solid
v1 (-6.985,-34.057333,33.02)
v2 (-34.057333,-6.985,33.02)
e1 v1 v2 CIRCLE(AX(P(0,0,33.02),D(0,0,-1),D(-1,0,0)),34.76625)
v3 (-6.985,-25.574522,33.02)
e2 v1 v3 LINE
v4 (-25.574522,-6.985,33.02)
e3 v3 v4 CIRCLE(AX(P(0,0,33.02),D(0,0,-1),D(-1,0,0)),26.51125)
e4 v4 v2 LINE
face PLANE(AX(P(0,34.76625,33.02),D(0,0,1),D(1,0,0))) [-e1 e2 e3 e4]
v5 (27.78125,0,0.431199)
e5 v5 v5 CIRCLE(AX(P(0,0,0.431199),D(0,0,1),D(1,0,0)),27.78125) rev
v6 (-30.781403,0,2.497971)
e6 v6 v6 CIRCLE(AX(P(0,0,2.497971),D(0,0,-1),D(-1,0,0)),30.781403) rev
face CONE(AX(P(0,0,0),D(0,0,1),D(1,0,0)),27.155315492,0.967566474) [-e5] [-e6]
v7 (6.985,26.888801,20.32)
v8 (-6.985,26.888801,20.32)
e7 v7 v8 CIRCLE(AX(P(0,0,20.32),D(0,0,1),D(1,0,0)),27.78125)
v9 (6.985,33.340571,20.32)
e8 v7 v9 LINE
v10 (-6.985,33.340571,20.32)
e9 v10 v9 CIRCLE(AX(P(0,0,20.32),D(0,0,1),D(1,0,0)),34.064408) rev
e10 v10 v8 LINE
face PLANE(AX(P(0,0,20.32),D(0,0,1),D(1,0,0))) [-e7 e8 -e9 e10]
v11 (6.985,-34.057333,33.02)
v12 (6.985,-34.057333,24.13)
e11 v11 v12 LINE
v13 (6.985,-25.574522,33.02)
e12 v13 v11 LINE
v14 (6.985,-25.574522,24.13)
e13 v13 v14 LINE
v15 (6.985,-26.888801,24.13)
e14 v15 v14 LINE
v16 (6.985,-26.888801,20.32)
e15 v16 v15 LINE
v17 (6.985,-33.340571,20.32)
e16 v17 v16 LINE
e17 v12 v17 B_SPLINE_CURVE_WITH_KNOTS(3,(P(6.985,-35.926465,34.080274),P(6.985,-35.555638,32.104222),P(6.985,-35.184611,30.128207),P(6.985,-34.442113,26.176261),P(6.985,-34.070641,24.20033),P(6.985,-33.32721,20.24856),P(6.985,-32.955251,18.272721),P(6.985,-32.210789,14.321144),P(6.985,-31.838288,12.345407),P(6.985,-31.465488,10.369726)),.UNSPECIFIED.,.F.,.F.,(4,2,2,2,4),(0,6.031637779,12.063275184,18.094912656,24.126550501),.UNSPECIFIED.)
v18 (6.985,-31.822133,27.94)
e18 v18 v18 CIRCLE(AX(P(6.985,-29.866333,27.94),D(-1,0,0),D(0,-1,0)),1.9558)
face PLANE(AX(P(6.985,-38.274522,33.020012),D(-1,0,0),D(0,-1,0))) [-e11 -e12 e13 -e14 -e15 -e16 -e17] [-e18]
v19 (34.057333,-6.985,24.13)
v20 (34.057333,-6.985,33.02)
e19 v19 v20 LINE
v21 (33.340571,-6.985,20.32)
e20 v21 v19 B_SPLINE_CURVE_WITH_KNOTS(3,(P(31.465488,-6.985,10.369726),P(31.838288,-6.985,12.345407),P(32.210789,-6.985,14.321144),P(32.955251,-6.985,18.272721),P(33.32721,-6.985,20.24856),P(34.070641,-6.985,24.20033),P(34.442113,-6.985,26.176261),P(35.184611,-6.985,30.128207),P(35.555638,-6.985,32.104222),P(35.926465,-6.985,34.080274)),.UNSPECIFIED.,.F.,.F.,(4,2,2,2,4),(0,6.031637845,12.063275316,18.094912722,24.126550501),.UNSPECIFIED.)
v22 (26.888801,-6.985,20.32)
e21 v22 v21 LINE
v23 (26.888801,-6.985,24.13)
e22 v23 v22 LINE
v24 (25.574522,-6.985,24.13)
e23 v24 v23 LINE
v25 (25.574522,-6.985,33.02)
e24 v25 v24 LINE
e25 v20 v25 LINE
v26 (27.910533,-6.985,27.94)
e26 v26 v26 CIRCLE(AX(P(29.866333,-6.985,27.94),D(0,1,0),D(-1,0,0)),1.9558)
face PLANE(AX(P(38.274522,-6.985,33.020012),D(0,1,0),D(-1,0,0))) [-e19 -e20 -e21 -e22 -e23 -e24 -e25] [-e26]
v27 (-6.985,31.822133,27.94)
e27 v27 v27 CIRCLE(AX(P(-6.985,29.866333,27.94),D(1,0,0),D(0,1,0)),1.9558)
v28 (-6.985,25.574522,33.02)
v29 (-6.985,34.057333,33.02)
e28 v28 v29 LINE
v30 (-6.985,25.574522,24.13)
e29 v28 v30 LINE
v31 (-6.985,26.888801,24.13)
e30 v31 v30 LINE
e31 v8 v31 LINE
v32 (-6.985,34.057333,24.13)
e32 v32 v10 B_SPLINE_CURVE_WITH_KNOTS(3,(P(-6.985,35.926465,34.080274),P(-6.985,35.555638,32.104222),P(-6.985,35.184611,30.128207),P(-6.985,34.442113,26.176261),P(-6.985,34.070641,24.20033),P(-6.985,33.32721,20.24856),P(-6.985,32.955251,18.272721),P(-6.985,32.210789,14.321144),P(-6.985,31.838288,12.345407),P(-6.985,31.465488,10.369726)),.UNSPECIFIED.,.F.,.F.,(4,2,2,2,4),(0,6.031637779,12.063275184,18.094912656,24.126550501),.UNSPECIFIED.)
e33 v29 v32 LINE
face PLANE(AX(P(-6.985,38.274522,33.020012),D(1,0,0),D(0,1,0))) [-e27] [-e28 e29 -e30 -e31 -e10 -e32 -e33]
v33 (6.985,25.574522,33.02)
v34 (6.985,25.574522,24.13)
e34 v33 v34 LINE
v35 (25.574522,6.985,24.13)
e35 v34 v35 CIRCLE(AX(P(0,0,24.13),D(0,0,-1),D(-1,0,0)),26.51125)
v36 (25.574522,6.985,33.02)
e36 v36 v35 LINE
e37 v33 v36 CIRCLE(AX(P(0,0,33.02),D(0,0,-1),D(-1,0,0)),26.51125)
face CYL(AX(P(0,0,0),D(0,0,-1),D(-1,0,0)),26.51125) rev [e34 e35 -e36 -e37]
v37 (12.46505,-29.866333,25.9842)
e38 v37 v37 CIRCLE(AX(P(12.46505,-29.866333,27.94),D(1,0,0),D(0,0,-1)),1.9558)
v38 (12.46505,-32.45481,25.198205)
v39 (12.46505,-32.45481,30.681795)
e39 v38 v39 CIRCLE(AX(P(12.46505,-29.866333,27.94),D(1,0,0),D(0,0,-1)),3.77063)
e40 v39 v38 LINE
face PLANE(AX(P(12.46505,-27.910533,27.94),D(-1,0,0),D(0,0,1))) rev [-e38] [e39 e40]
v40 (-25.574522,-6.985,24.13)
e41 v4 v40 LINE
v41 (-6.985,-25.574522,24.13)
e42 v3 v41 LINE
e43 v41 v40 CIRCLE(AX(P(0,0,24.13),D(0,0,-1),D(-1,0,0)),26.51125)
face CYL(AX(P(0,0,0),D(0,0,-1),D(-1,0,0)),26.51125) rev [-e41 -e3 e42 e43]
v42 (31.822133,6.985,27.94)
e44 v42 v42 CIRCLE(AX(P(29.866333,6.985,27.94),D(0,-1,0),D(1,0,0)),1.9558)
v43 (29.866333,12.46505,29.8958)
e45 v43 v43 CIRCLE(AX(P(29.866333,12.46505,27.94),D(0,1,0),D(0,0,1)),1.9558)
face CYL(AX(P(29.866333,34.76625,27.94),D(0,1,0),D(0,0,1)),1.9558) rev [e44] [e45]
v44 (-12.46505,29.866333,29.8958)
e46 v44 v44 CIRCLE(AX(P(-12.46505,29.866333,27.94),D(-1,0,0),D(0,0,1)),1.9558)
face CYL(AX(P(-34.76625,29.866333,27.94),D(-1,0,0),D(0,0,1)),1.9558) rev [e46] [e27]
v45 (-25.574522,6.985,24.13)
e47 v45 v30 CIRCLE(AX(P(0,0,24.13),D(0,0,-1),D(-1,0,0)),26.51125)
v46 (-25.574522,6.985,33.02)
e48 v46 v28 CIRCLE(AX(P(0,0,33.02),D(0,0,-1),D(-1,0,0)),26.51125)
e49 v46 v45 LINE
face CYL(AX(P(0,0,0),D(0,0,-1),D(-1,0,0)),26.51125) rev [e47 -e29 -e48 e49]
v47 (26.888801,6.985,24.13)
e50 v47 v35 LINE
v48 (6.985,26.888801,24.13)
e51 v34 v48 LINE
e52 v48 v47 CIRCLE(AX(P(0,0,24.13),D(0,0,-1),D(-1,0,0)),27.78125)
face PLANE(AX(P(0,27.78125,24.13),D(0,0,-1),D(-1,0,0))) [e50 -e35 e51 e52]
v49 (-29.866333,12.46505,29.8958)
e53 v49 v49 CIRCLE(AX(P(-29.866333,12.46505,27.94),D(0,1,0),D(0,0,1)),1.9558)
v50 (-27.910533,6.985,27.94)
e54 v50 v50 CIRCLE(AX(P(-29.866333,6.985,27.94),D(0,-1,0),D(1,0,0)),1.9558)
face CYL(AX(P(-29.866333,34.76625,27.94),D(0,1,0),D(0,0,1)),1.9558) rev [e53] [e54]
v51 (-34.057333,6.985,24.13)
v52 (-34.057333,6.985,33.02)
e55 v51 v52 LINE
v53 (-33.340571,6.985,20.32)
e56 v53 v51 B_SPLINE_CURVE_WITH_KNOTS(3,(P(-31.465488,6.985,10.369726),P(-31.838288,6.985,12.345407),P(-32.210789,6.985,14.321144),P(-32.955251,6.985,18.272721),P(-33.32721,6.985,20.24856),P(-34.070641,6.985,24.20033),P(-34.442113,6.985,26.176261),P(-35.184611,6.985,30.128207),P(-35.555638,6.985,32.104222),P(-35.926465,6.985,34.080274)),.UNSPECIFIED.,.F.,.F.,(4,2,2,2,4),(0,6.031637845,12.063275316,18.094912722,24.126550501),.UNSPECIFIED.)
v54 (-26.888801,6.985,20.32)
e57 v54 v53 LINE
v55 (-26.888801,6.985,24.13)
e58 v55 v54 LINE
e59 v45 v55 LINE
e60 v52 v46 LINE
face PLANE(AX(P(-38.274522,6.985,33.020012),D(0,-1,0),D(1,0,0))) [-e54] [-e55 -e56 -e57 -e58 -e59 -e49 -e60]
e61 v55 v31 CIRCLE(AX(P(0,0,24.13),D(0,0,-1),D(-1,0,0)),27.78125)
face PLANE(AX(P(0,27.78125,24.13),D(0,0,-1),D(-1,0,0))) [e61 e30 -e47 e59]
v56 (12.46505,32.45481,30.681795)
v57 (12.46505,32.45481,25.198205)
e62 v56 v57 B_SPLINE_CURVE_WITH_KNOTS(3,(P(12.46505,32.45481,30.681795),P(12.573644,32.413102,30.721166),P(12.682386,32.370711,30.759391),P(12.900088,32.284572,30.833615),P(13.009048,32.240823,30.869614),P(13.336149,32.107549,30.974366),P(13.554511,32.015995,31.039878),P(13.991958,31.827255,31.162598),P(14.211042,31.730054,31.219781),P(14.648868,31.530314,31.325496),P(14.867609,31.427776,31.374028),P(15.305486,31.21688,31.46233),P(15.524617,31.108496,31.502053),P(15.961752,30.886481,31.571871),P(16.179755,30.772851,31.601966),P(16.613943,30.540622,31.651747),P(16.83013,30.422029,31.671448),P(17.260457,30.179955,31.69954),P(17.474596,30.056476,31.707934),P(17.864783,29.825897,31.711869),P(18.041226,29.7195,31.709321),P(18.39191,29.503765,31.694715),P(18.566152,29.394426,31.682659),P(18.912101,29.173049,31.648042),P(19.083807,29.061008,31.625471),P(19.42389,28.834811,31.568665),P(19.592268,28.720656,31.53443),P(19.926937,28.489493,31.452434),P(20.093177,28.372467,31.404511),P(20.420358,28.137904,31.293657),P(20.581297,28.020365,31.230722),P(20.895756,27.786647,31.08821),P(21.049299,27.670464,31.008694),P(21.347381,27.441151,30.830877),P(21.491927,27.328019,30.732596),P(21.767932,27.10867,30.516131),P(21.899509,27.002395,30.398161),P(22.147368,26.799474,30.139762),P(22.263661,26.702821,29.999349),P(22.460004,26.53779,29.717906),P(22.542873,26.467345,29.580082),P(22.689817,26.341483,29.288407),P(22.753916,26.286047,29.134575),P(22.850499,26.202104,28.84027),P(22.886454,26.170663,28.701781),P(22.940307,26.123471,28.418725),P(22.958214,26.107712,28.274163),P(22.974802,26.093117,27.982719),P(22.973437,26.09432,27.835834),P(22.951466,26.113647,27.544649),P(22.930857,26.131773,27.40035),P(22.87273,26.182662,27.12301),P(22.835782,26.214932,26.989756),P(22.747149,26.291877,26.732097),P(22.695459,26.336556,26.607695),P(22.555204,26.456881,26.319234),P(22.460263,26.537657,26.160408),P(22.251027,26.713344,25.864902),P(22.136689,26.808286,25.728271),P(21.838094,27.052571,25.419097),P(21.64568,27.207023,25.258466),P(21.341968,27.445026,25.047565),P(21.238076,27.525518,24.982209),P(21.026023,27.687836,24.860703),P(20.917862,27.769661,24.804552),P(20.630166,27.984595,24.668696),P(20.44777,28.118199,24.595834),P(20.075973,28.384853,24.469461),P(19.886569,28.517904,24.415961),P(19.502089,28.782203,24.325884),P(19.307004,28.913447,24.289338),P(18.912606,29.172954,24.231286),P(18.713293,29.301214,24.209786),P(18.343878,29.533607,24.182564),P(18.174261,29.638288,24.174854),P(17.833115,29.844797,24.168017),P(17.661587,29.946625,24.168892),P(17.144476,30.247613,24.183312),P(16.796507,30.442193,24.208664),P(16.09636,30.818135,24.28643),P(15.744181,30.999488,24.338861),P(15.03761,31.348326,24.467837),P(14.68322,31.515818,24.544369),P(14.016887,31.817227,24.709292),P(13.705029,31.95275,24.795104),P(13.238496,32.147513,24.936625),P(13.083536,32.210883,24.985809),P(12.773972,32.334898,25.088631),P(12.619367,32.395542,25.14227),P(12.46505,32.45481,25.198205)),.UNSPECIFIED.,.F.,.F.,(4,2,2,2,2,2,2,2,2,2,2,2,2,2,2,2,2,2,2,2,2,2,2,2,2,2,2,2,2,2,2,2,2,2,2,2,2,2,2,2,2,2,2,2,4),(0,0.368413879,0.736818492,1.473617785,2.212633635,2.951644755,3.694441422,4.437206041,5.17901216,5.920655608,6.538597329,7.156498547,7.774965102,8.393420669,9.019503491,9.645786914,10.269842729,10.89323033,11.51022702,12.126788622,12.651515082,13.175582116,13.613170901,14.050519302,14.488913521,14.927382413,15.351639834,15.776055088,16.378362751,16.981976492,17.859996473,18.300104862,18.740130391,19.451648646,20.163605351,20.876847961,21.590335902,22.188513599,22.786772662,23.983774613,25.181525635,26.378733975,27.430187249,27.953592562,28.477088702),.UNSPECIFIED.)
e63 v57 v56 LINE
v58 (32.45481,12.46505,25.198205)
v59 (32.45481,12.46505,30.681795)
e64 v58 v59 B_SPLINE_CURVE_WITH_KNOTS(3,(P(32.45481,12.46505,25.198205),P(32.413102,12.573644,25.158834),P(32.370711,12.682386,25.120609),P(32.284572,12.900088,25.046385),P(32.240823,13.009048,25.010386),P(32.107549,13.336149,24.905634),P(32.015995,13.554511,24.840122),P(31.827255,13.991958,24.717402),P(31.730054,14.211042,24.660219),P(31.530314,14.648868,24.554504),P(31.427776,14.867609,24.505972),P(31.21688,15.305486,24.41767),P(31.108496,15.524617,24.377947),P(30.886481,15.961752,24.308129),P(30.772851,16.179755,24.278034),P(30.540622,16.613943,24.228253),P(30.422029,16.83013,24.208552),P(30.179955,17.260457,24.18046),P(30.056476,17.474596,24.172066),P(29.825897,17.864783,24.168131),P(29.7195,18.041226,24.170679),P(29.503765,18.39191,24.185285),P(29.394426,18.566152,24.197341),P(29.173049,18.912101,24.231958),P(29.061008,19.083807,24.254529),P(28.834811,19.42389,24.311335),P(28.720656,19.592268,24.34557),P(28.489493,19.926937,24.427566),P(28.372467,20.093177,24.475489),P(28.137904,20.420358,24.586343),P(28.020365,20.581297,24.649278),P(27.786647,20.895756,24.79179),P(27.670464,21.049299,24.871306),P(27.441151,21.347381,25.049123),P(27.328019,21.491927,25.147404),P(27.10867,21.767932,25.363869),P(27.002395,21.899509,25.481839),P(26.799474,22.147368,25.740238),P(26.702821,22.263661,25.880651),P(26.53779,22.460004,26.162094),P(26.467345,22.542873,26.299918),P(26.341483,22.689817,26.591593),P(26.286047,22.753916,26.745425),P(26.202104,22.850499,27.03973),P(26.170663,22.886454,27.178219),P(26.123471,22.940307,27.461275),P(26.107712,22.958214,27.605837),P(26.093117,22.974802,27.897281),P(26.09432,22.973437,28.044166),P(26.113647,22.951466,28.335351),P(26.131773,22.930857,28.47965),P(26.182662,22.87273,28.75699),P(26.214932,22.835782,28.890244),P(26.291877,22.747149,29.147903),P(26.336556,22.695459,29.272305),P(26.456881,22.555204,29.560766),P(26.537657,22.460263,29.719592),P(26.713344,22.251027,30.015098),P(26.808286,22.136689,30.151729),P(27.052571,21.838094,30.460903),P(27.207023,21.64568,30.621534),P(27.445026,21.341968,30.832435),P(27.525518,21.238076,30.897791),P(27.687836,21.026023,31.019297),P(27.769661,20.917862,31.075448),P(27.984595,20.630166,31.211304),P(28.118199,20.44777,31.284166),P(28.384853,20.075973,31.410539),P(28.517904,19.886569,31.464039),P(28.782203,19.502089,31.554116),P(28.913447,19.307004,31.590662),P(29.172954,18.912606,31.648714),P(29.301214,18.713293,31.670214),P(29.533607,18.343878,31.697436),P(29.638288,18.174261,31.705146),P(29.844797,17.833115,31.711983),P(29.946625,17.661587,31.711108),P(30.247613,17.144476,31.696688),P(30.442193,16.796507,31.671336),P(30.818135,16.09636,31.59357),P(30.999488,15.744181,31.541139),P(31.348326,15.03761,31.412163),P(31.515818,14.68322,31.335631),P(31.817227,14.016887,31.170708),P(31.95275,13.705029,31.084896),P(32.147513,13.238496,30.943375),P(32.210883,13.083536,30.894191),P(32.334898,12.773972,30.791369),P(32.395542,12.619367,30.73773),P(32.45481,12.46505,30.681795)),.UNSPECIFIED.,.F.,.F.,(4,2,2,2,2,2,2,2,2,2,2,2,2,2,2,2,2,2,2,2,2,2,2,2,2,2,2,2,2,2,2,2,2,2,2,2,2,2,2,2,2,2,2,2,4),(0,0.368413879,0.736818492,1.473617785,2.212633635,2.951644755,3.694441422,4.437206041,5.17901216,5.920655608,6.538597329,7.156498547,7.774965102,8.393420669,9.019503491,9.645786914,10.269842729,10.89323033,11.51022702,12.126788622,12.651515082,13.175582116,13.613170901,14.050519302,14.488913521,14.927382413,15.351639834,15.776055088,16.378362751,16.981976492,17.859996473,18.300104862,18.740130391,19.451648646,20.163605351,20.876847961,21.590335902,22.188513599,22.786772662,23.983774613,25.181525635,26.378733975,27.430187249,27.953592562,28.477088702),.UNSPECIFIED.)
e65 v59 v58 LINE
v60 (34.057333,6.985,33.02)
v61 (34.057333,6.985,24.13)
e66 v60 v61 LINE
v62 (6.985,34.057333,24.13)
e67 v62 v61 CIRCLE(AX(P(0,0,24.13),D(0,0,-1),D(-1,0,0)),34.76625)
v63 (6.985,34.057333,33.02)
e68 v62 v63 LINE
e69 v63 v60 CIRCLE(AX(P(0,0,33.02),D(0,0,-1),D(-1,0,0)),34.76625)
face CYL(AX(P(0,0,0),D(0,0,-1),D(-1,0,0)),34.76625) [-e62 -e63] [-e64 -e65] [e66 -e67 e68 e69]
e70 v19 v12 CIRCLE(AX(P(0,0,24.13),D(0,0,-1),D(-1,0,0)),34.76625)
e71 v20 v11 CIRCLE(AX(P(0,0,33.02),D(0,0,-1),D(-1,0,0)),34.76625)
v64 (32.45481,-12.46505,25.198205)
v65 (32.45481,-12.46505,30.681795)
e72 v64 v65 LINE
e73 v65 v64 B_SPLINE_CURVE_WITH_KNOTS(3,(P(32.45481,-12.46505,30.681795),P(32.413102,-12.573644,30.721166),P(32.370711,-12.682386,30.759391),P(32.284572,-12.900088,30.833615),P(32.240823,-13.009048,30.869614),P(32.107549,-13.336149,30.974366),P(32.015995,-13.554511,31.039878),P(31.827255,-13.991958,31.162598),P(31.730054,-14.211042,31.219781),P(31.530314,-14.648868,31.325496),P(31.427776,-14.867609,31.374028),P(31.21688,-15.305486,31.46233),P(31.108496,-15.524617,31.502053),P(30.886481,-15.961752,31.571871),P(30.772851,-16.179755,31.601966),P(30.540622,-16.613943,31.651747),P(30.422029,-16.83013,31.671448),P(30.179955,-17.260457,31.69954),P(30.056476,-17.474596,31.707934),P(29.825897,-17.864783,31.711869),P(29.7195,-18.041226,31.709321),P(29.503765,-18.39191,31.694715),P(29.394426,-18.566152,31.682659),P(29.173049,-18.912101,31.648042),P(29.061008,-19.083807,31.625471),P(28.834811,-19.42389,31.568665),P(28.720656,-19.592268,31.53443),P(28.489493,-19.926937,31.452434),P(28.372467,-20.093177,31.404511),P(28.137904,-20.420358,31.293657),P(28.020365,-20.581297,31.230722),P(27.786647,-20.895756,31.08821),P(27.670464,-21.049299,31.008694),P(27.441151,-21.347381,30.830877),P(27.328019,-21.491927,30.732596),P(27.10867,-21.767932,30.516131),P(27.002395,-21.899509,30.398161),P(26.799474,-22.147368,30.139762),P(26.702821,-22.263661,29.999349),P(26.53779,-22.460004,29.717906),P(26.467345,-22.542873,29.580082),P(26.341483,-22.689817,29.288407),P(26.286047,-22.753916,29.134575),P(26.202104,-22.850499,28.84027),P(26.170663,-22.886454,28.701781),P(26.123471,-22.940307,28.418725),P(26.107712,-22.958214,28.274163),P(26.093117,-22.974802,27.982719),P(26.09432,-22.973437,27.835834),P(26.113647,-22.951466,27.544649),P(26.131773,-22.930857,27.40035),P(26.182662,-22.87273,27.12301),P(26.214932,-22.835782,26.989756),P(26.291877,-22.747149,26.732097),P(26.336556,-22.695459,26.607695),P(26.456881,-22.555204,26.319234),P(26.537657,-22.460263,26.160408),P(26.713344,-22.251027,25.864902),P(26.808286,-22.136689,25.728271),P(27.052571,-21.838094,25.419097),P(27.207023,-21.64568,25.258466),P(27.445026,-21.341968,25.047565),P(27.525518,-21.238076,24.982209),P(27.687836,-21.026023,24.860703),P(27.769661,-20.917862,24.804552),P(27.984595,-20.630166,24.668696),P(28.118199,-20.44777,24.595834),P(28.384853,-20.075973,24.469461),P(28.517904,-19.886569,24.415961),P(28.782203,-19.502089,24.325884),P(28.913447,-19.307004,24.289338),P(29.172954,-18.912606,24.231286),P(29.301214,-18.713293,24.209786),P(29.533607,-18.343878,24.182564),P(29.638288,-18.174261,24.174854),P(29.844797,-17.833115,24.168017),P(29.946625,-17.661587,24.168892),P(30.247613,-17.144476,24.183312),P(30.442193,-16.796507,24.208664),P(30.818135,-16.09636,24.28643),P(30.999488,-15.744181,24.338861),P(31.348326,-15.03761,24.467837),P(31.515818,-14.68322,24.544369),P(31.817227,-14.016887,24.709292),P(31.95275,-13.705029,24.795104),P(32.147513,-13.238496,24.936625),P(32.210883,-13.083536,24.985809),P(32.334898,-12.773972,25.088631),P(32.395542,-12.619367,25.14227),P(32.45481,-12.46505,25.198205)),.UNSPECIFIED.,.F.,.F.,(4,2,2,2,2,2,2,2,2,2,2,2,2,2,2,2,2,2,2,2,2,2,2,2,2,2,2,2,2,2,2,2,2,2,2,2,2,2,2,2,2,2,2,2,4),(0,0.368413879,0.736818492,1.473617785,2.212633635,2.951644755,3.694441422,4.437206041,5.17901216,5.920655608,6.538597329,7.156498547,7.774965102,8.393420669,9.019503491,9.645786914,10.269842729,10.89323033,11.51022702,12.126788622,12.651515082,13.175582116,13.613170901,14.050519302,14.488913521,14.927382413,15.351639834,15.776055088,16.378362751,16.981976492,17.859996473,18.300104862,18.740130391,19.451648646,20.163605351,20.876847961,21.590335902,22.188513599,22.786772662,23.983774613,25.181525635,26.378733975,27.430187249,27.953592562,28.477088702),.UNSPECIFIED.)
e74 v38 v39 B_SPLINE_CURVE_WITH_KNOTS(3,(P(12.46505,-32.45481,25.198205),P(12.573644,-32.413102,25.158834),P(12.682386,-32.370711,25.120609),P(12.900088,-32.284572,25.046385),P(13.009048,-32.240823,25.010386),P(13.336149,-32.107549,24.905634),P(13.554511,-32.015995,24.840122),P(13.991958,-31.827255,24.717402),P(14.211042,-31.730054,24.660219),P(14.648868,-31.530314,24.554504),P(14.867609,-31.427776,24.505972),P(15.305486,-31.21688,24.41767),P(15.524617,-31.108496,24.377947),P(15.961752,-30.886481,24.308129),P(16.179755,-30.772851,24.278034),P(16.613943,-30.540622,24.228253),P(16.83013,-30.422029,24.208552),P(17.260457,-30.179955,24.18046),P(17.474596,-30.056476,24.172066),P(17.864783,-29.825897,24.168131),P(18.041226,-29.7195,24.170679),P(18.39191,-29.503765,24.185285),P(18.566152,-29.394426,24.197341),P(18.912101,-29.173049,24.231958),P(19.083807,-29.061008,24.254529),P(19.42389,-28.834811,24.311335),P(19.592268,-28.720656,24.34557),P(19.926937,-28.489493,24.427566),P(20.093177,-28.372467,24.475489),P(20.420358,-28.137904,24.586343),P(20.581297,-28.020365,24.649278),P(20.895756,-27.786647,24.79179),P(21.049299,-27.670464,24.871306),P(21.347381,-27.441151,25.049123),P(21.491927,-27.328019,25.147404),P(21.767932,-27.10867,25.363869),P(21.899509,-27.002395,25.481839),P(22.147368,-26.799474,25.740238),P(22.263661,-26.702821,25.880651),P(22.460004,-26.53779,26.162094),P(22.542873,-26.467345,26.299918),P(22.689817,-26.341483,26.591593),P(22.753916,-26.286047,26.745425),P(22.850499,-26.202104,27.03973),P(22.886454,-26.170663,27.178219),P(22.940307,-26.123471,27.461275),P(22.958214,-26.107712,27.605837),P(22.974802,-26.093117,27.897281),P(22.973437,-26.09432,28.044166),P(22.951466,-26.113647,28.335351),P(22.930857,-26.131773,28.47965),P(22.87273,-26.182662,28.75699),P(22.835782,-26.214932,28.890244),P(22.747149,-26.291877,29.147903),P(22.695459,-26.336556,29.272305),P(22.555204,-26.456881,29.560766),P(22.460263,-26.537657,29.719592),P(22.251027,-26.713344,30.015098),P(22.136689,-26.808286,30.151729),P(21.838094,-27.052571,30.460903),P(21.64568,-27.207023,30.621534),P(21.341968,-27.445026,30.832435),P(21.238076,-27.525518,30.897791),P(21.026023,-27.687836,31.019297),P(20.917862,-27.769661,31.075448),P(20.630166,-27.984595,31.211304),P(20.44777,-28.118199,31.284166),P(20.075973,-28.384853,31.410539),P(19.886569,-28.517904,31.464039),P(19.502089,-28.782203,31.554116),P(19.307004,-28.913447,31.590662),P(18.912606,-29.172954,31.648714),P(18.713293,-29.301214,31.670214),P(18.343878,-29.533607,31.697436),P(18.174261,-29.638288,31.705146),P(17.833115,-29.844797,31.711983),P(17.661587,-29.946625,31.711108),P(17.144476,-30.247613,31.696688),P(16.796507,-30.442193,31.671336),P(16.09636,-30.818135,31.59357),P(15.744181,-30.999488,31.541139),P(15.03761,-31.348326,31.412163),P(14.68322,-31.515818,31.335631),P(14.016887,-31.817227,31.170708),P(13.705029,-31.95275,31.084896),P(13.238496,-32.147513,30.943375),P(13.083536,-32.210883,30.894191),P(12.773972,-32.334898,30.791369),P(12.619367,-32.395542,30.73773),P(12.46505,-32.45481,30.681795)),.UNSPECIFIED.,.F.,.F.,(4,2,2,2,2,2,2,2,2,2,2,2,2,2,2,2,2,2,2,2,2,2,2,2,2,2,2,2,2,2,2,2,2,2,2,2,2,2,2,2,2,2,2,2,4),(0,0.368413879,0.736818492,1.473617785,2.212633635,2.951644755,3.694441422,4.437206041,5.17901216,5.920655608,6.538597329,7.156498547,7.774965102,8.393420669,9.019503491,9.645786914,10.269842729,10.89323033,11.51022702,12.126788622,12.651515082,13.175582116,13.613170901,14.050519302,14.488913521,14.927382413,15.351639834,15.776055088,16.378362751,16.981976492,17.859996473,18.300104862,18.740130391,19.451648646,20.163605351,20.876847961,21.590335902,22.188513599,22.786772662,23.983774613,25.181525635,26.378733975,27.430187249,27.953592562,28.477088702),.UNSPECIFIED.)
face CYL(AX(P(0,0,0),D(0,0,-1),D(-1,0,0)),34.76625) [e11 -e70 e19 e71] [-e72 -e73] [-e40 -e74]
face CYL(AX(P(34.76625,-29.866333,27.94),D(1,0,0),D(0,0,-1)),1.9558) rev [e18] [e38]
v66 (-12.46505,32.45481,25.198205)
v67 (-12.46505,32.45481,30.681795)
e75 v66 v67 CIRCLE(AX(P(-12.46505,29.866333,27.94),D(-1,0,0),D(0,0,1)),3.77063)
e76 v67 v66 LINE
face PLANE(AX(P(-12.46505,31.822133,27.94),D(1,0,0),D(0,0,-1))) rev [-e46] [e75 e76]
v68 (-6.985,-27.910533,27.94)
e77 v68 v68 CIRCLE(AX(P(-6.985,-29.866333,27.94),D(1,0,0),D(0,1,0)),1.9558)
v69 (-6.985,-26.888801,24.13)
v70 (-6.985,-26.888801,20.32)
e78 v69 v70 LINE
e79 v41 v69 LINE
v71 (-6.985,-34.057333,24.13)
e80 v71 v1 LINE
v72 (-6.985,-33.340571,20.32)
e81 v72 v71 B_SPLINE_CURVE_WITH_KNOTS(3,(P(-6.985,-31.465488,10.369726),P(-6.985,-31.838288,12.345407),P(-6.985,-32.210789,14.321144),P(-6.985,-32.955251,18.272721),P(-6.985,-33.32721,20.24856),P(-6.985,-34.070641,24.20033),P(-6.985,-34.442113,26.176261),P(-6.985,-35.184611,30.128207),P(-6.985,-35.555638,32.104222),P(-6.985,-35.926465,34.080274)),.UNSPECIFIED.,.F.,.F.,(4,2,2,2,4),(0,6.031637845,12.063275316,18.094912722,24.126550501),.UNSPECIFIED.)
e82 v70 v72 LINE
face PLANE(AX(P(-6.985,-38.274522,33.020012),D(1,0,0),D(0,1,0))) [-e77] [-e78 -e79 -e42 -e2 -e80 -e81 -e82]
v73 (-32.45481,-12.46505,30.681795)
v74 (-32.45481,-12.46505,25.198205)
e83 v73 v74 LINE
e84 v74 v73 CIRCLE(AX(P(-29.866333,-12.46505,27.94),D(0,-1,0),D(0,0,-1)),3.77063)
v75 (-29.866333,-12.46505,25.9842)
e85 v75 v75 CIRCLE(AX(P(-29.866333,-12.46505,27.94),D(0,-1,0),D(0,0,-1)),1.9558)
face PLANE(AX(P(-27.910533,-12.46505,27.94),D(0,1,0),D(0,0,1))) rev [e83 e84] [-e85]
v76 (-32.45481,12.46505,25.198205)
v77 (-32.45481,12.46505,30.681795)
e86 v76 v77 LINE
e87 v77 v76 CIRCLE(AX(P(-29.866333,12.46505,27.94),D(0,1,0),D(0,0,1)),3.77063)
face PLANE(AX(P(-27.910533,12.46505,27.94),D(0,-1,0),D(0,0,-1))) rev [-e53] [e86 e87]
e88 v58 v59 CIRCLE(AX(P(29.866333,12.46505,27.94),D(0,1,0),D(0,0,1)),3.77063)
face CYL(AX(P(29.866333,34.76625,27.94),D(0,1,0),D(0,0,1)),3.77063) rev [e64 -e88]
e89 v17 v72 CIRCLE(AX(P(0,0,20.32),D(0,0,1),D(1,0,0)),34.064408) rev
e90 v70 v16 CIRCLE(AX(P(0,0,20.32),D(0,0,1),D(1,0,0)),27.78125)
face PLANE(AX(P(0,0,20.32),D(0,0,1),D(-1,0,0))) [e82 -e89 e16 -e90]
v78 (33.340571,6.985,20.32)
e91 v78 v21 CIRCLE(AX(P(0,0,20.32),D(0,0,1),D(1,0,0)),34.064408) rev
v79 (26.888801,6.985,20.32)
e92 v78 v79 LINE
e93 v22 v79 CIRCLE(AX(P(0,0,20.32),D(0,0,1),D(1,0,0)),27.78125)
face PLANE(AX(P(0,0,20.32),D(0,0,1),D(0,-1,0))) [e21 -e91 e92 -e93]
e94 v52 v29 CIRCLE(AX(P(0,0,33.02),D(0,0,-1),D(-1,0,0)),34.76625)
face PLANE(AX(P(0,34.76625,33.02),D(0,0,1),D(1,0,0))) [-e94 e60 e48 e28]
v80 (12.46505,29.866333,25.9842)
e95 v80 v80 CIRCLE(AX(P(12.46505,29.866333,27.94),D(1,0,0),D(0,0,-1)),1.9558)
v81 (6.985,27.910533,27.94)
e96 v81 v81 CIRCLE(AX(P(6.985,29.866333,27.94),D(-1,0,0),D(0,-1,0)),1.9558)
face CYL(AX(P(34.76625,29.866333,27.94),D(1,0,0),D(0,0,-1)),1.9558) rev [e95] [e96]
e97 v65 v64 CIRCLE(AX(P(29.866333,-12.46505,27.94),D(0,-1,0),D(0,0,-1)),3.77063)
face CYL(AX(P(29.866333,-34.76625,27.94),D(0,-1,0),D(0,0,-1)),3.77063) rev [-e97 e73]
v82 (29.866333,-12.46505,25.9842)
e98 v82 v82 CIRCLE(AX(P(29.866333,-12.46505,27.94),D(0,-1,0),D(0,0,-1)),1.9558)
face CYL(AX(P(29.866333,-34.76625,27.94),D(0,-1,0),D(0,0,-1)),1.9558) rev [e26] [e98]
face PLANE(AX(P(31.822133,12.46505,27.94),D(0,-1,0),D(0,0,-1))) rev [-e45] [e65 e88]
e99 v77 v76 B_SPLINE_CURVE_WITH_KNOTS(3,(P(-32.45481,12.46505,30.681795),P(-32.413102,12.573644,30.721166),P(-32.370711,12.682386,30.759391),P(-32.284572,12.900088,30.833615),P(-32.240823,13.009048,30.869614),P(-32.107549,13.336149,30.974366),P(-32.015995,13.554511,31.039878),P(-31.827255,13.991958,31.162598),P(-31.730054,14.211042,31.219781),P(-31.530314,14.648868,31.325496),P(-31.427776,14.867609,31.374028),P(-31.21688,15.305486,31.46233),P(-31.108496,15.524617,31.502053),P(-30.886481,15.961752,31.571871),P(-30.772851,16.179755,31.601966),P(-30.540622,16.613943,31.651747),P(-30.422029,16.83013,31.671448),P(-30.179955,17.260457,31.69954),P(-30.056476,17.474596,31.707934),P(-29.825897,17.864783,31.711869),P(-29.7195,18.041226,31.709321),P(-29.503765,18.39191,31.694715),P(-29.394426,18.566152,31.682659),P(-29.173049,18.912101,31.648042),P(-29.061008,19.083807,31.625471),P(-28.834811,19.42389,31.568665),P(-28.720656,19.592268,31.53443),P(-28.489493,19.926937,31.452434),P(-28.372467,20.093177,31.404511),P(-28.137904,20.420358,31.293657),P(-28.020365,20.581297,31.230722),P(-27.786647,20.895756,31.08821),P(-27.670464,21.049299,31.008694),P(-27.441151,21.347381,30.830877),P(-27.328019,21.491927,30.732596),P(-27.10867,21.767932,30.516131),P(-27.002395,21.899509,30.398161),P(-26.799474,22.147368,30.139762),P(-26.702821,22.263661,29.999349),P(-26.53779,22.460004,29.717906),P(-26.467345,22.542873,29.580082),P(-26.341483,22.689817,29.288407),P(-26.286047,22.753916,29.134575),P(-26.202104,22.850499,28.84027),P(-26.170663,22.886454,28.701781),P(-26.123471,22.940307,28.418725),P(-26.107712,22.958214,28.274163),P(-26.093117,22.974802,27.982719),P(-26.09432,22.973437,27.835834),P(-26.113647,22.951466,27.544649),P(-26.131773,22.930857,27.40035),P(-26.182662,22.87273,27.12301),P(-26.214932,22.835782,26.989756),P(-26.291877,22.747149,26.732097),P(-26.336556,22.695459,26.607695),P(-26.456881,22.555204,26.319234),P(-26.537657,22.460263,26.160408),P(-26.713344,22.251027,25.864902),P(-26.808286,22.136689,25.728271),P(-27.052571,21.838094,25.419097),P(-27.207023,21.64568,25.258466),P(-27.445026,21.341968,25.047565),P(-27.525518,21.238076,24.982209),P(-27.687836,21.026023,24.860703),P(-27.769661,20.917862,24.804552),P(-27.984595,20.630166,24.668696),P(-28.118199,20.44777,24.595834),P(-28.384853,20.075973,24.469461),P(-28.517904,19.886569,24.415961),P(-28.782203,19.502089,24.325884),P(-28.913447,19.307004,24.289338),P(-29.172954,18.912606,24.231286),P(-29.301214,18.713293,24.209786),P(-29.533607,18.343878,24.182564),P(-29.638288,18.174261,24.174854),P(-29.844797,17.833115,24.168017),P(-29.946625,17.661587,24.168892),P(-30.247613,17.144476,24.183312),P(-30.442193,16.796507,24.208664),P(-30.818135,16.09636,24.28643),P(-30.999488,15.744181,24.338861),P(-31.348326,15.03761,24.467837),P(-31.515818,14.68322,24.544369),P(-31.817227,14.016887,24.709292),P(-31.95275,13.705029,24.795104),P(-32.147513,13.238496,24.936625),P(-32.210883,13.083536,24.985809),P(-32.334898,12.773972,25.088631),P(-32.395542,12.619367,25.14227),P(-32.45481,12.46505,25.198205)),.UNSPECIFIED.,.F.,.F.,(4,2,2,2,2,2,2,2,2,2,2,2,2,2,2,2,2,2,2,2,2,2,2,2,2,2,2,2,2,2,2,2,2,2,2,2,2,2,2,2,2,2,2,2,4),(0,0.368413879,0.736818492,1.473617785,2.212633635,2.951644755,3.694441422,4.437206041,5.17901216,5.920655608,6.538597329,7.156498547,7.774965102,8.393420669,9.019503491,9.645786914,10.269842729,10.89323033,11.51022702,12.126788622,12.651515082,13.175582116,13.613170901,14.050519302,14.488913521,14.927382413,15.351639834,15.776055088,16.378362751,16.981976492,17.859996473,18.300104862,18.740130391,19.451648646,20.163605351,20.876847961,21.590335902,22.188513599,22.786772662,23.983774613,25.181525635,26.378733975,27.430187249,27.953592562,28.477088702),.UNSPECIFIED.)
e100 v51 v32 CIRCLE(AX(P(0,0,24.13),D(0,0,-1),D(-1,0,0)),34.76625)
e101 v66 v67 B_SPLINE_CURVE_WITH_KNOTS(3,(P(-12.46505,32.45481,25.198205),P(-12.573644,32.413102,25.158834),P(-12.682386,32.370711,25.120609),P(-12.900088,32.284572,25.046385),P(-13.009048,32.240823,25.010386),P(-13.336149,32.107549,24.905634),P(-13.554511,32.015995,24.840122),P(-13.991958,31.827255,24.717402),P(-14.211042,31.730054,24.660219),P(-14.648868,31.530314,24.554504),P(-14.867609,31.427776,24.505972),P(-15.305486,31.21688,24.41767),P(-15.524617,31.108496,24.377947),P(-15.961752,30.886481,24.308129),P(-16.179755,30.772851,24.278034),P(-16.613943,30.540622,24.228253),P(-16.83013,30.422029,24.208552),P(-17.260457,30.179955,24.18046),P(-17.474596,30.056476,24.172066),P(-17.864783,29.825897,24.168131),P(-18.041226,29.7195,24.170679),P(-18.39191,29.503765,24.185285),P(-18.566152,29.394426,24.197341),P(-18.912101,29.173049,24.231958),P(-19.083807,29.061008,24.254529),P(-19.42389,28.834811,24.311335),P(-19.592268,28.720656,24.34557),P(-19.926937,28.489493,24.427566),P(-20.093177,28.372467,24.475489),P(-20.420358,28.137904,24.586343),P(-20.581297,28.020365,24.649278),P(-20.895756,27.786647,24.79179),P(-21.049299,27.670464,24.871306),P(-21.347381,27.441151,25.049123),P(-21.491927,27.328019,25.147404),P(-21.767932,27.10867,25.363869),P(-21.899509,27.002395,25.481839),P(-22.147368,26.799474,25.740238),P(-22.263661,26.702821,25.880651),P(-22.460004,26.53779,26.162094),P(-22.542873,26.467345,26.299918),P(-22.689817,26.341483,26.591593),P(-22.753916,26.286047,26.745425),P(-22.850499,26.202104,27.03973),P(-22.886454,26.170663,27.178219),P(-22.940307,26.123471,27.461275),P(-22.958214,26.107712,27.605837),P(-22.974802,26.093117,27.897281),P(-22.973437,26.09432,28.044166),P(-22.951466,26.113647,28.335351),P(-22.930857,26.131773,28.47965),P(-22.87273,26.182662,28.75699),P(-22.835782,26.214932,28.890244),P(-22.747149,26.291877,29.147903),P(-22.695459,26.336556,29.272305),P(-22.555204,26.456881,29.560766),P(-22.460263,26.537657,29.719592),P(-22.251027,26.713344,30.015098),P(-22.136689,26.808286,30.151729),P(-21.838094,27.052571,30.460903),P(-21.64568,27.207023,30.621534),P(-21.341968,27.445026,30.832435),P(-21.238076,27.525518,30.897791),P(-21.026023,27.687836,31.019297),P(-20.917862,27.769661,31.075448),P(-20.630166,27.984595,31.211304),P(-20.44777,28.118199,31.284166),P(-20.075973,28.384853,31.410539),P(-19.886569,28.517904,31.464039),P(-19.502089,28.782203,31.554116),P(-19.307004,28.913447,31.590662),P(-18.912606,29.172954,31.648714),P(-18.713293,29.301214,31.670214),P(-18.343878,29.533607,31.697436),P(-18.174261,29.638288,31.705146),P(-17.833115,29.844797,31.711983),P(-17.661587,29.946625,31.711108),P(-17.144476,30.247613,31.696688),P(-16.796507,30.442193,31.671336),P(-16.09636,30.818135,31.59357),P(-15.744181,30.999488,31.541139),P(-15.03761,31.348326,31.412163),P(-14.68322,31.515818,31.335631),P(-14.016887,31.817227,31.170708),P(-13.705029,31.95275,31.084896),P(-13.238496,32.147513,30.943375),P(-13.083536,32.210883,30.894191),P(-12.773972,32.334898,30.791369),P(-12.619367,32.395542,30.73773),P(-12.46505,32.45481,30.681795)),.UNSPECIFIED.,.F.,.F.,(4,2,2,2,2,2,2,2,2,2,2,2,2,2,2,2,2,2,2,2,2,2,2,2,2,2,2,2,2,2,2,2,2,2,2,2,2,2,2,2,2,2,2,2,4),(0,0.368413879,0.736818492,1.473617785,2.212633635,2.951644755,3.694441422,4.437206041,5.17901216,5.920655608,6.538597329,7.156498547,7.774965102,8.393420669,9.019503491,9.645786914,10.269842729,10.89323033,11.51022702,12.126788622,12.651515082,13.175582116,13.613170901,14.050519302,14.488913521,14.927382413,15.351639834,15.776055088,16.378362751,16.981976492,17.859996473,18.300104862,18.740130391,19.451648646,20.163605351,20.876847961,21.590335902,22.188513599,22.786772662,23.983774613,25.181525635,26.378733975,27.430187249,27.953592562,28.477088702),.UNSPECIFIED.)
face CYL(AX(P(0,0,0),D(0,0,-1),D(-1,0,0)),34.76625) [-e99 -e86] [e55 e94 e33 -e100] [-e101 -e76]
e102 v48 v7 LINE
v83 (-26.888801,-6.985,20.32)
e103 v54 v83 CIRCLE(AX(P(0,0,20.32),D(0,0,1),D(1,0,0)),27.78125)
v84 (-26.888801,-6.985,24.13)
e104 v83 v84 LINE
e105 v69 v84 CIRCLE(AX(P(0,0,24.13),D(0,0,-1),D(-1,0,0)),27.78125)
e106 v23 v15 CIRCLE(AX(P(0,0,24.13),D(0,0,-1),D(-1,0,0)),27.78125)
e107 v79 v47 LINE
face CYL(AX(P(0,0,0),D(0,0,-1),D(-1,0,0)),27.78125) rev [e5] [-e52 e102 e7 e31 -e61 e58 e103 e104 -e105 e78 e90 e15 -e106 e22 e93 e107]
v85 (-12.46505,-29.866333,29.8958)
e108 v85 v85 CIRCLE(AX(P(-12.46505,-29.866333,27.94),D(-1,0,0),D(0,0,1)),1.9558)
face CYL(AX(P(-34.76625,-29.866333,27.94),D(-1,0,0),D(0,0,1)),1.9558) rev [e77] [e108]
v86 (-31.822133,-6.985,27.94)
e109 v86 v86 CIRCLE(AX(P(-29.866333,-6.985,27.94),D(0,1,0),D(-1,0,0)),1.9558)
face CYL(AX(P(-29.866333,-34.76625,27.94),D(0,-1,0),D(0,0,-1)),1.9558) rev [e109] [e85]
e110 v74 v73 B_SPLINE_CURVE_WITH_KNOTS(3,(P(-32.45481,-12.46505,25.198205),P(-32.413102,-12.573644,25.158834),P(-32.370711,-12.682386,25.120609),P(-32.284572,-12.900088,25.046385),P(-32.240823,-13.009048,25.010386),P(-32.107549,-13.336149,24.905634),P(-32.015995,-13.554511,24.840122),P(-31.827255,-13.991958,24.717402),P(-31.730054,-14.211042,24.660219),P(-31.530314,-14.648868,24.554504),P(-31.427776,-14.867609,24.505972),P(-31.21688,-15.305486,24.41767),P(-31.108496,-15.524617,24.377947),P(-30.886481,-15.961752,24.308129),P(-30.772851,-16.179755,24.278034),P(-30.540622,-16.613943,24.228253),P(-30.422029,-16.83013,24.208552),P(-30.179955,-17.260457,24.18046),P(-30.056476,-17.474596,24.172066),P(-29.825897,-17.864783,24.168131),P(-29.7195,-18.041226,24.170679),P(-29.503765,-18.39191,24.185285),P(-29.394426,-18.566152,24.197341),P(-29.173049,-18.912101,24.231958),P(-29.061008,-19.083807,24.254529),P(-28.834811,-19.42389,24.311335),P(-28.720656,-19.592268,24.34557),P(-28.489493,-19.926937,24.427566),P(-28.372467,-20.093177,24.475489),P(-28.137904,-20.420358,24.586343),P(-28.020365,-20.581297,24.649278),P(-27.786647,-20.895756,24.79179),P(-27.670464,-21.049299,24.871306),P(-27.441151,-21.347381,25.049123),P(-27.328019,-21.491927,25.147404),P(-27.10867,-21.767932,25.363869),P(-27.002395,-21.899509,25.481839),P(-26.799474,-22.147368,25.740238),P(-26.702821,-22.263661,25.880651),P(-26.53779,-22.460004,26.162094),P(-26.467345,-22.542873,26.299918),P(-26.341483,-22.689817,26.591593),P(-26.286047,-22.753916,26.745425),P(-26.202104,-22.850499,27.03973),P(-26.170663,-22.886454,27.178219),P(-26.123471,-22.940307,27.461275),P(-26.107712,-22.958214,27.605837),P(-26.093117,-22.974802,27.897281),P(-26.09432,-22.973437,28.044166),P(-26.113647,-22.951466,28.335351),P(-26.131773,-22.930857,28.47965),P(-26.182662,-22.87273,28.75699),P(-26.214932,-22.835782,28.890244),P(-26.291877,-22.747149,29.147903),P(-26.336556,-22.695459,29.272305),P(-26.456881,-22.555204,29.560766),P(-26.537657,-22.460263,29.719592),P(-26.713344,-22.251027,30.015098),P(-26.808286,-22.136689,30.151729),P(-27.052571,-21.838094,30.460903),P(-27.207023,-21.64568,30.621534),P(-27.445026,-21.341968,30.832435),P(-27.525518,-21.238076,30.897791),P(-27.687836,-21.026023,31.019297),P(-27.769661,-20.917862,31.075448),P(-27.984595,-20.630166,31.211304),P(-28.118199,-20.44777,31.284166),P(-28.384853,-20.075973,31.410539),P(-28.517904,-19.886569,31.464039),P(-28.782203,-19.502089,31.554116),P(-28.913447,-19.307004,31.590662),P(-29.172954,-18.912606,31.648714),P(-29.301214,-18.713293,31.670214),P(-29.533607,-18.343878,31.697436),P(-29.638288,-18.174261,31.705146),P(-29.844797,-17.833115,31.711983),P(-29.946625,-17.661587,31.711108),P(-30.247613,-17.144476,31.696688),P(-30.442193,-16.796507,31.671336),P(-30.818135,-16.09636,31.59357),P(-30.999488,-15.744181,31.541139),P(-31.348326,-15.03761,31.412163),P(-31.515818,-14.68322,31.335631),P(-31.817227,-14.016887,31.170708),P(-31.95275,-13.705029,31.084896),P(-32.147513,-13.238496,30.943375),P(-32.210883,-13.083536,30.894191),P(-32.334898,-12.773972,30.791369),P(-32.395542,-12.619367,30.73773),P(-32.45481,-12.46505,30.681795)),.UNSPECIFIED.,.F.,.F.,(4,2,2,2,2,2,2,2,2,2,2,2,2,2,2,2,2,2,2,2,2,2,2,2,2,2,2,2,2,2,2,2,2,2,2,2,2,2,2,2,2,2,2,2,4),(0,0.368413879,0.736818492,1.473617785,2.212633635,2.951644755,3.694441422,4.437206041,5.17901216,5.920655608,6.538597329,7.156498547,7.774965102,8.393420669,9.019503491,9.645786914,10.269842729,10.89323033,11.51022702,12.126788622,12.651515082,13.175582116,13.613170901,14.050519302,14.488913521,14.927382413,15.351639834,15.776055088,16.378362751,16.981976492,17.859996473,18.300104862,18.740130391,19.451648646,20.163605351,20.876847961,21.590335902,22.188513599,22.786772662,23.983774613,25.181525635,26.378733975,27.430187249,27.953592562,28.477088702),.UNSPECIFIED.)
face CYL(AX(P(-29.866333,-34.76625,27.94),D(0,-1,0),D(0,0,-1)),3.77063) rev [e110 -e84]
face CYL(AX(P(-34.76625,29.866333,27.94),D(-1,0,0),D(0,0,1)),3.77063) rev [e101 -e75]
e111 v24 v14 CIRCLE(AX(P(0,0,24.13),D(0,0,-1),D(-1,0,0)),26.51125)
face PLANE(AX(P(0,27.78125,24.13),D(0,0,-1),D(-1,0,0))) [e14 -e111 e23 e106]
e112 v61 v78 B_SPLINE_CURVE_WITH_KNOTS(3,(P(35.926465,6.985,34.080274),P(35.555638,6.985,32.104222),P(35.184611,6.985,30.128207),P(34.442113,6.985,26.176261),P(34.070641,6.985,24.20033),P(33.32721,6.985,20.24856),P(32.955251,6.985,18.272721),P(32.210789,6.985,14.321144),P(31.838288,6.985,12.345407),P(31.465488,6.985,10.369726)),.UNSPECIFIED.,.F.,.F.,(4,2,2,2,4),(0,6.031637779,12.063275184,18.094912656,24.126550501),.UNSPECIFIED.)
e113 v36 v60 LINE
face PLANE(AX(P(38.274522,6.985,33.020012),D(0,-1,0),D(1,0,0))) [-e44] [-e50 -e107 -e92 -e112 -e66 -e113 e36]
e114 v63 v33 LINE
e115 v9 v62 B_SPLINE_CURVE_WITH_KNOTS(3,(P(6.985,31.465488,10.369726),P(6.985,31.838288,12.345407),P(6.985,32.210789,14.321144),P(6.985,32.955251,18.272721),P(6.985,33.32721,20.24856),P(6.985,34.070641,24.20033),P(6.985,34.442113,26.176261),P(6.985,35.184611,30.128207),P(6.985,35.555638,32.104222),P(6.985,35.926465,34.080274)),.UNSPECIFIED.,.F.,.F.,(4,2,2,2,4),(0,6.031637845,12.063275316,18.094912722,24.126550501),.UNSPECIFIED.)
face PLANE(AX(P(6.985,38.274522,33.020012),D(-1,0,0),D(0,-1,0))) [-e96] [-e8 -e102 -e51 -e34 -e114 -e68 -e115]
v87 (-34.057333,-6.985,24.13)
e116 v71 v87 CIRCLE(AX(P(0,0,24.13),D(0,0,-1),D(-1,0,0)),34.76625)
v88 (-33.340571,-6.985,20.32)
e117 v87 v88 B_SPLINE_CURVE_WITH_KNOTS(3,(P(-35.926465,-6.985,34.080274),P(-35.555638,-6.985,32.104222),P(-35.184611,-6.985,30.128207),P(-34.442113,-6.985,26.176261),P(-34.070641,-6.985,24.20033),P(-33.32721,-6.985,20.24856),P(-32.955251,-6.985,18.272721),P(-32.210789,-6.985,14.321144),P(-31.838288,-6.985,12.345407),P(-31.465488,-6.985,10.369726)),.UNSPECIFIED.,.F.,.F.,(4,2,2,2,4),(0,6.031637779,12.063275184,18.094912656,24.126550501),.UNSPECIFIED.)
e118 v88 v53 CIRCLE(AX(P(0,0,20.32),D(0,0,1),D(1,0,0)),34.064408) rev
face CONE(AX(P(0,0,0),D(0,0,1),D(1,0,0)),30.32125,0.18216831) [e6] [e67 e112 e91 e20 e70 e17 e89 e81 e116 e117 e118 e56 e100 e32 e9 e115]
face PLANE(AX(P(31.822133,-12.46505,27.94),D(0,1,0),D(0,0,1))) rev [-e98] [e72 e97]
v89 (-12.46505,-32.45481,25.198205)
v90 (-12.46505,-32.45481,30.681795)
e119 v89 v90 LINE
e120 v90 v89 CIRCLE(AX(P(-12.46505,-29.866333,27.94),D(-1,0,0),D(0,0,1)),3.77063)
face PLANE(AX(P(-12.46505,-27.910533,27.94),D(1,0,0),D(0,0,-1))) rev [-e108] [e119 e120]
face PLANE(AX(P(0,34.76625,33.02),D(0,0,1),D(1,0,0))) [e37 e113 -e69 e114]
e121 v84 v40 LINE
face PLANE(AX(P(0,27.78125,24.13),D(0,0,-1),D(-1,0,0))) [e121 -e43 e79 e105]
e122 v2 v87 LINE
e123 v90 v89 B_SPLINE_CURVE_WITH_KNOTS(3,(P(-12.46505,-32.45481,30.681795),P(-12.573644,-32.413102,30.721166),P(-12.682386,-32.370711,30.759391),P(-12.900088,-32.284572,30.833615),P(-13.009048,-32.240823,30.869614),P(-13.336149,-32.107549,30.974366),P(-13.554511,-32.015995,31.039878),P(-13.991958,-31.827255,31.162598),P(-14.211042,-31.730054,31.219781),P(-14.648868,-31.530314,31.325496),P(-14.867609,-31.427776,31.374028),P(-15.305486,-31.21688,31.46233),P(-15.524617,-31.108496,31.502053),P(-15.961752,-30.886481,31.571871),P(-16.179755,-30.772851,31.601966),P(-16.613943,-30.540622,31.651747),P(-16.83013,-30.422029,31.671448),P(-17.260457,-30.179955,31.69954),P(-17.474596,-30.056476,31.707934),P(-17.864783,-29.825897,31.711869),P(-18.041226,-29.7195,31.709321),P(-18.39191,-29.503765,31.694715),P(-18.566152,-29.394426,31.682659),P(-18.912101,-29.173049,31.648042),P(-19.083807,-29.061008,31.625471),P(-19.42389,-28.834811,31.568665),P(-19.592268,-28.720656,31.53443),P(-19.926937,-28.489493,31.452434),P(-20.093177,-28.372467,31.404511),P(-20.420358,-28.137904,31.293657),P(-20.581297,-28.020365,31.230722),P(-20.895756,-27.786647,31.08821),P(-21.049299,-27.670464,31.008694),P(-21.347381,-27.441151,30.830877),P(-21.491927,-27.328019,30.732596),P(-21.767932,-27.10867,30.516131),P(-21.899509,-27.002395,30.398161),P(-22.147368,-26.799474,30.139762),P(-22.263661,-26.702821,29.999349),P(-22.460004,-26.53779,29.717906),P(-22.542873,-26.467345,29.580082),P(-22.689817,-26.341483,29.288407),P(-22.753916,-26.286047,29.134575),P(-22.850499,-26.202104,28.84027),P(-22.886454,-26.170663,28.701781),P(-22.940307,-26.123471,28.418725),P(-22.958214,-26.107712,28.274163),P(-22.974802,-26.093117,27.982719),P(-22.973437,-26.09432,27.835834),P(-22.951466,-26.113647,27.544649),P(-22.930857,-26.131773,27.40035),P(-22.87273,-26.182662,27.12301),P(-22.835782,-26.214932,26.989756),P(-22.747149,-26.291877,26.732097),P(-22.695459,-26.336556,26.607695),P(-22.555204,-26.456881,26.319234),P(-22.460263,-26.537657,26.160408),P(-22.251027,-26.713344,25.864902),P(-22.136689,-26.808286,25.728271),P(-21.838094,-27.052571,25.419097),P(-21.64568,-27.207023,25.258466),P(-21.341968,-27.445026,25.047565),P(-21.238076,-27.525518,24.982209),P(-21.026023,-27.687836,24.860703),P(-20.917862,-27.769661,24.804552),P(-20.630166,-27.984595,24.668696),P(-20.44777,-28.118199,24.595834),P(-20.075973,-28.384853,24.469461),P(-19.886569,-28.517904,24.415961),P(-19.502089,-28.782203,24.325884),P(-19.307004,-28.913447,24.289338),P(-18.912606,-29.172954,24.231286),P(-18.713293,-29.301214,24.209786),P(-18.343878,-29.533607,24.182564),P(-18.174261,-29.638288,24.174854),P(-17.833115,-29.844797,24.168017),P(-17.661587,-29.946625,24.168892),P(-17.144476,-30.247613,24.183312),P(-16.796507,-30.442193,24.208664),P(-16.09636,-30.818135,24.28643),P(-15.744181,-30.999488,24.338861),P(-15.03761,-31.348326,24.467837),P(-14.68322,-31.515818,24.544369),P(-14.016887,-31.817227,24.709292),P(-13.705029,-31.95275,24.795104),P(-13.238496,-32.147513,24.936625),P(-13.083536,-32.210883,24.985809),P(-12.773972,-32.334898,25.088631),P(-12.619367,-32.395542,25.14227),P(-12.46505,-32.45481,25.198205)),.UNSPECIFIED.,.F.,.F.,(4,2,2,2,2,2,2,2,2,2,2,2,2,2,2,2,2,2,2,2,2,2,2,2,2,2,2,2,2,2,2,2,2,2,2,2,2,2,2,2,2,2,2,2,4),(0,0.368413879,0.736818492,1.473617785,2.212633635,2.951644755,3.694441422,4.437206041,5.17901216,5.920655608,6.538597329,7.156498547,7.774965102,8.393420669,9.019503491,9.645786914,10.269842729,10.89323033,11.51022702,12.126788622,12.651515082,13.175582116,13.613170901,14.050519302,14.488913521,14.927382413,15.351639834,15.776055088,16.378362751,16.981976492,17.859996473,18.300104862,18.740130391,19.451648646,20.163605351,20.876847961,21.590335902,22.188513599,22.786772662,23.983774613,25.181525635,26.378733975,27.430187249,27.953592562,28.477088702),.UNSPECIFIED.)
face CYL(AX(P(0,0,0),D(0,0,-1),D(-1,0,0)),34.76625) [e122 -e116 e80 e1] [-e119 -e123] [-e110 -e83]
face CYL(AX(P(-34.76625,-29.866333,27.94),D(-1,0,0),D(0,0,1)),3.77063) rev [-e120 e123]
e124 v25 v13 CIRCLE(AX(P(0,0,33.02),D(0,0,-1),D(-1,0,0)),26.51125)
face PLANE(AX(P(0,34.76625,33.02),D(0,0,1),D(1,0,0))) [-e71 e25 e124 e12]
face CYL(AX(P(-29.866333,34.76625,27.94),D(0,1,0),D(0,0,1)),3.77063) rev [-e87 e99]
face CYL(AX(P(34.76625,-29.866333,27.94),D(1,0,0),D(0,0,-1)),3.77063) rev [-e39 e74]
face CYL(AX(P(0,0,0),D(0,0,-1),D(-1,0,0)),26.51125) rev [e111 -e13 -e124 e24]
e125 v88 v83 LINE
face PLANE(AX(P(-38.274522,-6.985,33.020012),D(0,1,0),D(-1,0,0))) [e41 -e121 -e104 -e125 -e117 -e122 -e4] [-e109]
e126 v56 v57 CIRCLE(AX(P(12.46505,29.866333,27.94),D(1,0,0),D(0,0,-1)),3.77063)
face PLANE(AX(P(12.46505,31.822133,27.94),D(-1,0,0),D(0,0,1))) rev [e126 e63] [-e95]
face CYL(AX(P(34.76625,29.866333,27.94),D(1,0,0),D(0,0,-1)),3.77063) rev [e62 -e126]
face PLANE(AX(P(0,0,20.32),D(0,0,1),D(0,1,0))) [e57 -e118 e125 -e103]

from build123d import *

# Parameters (mm, degrees)
PULLEY_RECESS_START = -12.7
SKETCH5_W           = 13.97
SKETCH5_H           = 12.7
PULLEY_RECESS_DEPTH = 72.92587845
CIRPATTERN1_COUNT   = 4
CHAMFER1_SIZE       = 2.54
CHAMFER1_SIZE_2     = 3.165934508


with BuildPart() as part:
    # Sketch1 → base_ring (revolve)
    with BuildSketch(Plane.YZ, mode=Mode.PRIVATE) as base_ring_sk:
        Polygon((27.78125, 0), (27.78125, 24.13), (26.51125, 24.13), (26.51125, 33.02), (34.76625, 33.02), (34.76625, 24.13), (30.32125, 0), align=None)
    revolve(base_ring_sk.sketch.rotate(Axis((0, 0, 0), (0, 0, 1)), 90), axis=Axis((0, 0, 0), (0, 0, 1)))

    # Sketch5 → pulley_recess (cut)
    with BuildSketch(Plane.XY.offset(33.02).offset(PULLEY_RECESS_START)):
        with Locations((0, 31.924521531)):
            Rectangle(SKETCH5_W, SKETCH5_H)
    pulley_recess = extrude(amount=PULLEY_RECESS_DEPTH, mode=Mode.SUBTRACT)

    # Sketch8 → pulley_bolt_hole (revolve, cut)
    with BuildSketch(Plane(origin=(34.76625, 29.86633275, 27.94), x_dir=(0, 0, -1), z_dir=(0, 1, 0))):
        Polygon((0, 0), (0, 39.275163199), (1.9558, 38.1), (1.9558, 22.3012), (3.77063, 22.3012), (3.77063, 0), align=None)
    pulley_bolt_hole = revolve(axis=Axis((41.11625, 29.86633275, 27.94), (-1, 0, 0)), mode=Mode.SUBTRACT)

    # bolthole_mirror: pulley_bolt_hole across plane
    add(pulley_bolt_hole.mirror(Plane(origin=(0, 0, 0), x_dir=(0, 0, 1), z_dir=(1, 0, 0))), mode=Mode.SUBTRACT)

    # CirPattern1: pulley_recess, pulley_bolt_hole ×4 about axis
    cirpattern1_axis = Axis((0, 0, 0), (0, 0, 1))
    add([pulley_recess.rotate(cirpattern1_axis, i * 360 / CIRPATTERN1_COUNT) for i in range(1, CIRPATTERN1_COUNT)], mode=Mode.SUBTRACT)
    add([pulley_bolt_hole.rotate(cirpattern1_axis, i * 360 / CIRPATTERN1_COUNT) for i in range(1, CIRPATTERN1_COUNT)], mode=Mode.SUBTRACT)

    # CirPattern1 copy 1 sketch → CirPattern1 copy 1 (revolve, cut)
    with BuildSketch(Plane(origin=(-29.86633275, -34.76625, 27.94), x_dir=(0, 0, -1), z_dir=(-1, 0, 0))):
        Polygon((0, 0), (0, -39.275163199), (1.9558, -38.1), (1.9558, -22.3012), (3.77063, -22.3012), (3.77063, 0), align=None)
    revolve(axis=Axis((-29.86633275, -41.11625, 27.94), (0, -1, 0)), mode=Mode.SUBTRACT)

    # CirPattern1 copy 2 sketch → CirPattern1 copy 2 (revolve, cut)
    with BuildSketch(Plane(origin=(34.76625, -29.86633275, 27.94), x_dir=(0, 0, -1), z_dir=(0, -1, 0))):
        Polygon((0, 0), (0, -39.275163199), (1.9558, -38.1), (1.9558, -22.3012), (3.77063, -22.3012), (3.77063, 0), align=None)
    revolve(axis=Axis((41.11625, -29.86633275, 27.94), (1, 0, 0)), mode=Mode.SUBTRACT)

    # CirPattern1 copy 3 sketch → CirPattern1 copy 3 (revolve, cut)
    with BuildSketch(Plane(origin=(29.86633275, 34.76625, 27.94), x_dir=(0, 0, -1), z_dir=(1, 0, 0))):
        Polygon((0, 0), (0, -39.275163199), (1.9558, -38.1), (1.9558, -22.3012), (3.77063, -22.3012), (3.77063, 0), align=None)
    revolve(axis=Axis((29.86633275, 41.11625, 27.94), (0, 1, 0)), mode=Mode.SUBTRACT)

    # Chamfer1
    # the kernel refuses this chamfer: 3.165934508, 2.54 mm, written as the material it takes off along each edge
    with BuildSketch(Plane(origin=(0, 0, 0), x_dir=(-1, 0, 0), z_dir=(0, 1, 0))) as chamfer1_piece_1:
        Polygon((30.32125 + CHAMFER1_SIZE * 0.181162429477, CHAMFER1_SIZE * 0.983453188589), (30.32125 - CHAMFER1_SIZE_2, 0), (30.32125, 0), align=None)
    revolve(axis=Axis((0, 0, 0), (0, 0, 1)), mode=Mode.SUBTRACT)


solid = part.part
